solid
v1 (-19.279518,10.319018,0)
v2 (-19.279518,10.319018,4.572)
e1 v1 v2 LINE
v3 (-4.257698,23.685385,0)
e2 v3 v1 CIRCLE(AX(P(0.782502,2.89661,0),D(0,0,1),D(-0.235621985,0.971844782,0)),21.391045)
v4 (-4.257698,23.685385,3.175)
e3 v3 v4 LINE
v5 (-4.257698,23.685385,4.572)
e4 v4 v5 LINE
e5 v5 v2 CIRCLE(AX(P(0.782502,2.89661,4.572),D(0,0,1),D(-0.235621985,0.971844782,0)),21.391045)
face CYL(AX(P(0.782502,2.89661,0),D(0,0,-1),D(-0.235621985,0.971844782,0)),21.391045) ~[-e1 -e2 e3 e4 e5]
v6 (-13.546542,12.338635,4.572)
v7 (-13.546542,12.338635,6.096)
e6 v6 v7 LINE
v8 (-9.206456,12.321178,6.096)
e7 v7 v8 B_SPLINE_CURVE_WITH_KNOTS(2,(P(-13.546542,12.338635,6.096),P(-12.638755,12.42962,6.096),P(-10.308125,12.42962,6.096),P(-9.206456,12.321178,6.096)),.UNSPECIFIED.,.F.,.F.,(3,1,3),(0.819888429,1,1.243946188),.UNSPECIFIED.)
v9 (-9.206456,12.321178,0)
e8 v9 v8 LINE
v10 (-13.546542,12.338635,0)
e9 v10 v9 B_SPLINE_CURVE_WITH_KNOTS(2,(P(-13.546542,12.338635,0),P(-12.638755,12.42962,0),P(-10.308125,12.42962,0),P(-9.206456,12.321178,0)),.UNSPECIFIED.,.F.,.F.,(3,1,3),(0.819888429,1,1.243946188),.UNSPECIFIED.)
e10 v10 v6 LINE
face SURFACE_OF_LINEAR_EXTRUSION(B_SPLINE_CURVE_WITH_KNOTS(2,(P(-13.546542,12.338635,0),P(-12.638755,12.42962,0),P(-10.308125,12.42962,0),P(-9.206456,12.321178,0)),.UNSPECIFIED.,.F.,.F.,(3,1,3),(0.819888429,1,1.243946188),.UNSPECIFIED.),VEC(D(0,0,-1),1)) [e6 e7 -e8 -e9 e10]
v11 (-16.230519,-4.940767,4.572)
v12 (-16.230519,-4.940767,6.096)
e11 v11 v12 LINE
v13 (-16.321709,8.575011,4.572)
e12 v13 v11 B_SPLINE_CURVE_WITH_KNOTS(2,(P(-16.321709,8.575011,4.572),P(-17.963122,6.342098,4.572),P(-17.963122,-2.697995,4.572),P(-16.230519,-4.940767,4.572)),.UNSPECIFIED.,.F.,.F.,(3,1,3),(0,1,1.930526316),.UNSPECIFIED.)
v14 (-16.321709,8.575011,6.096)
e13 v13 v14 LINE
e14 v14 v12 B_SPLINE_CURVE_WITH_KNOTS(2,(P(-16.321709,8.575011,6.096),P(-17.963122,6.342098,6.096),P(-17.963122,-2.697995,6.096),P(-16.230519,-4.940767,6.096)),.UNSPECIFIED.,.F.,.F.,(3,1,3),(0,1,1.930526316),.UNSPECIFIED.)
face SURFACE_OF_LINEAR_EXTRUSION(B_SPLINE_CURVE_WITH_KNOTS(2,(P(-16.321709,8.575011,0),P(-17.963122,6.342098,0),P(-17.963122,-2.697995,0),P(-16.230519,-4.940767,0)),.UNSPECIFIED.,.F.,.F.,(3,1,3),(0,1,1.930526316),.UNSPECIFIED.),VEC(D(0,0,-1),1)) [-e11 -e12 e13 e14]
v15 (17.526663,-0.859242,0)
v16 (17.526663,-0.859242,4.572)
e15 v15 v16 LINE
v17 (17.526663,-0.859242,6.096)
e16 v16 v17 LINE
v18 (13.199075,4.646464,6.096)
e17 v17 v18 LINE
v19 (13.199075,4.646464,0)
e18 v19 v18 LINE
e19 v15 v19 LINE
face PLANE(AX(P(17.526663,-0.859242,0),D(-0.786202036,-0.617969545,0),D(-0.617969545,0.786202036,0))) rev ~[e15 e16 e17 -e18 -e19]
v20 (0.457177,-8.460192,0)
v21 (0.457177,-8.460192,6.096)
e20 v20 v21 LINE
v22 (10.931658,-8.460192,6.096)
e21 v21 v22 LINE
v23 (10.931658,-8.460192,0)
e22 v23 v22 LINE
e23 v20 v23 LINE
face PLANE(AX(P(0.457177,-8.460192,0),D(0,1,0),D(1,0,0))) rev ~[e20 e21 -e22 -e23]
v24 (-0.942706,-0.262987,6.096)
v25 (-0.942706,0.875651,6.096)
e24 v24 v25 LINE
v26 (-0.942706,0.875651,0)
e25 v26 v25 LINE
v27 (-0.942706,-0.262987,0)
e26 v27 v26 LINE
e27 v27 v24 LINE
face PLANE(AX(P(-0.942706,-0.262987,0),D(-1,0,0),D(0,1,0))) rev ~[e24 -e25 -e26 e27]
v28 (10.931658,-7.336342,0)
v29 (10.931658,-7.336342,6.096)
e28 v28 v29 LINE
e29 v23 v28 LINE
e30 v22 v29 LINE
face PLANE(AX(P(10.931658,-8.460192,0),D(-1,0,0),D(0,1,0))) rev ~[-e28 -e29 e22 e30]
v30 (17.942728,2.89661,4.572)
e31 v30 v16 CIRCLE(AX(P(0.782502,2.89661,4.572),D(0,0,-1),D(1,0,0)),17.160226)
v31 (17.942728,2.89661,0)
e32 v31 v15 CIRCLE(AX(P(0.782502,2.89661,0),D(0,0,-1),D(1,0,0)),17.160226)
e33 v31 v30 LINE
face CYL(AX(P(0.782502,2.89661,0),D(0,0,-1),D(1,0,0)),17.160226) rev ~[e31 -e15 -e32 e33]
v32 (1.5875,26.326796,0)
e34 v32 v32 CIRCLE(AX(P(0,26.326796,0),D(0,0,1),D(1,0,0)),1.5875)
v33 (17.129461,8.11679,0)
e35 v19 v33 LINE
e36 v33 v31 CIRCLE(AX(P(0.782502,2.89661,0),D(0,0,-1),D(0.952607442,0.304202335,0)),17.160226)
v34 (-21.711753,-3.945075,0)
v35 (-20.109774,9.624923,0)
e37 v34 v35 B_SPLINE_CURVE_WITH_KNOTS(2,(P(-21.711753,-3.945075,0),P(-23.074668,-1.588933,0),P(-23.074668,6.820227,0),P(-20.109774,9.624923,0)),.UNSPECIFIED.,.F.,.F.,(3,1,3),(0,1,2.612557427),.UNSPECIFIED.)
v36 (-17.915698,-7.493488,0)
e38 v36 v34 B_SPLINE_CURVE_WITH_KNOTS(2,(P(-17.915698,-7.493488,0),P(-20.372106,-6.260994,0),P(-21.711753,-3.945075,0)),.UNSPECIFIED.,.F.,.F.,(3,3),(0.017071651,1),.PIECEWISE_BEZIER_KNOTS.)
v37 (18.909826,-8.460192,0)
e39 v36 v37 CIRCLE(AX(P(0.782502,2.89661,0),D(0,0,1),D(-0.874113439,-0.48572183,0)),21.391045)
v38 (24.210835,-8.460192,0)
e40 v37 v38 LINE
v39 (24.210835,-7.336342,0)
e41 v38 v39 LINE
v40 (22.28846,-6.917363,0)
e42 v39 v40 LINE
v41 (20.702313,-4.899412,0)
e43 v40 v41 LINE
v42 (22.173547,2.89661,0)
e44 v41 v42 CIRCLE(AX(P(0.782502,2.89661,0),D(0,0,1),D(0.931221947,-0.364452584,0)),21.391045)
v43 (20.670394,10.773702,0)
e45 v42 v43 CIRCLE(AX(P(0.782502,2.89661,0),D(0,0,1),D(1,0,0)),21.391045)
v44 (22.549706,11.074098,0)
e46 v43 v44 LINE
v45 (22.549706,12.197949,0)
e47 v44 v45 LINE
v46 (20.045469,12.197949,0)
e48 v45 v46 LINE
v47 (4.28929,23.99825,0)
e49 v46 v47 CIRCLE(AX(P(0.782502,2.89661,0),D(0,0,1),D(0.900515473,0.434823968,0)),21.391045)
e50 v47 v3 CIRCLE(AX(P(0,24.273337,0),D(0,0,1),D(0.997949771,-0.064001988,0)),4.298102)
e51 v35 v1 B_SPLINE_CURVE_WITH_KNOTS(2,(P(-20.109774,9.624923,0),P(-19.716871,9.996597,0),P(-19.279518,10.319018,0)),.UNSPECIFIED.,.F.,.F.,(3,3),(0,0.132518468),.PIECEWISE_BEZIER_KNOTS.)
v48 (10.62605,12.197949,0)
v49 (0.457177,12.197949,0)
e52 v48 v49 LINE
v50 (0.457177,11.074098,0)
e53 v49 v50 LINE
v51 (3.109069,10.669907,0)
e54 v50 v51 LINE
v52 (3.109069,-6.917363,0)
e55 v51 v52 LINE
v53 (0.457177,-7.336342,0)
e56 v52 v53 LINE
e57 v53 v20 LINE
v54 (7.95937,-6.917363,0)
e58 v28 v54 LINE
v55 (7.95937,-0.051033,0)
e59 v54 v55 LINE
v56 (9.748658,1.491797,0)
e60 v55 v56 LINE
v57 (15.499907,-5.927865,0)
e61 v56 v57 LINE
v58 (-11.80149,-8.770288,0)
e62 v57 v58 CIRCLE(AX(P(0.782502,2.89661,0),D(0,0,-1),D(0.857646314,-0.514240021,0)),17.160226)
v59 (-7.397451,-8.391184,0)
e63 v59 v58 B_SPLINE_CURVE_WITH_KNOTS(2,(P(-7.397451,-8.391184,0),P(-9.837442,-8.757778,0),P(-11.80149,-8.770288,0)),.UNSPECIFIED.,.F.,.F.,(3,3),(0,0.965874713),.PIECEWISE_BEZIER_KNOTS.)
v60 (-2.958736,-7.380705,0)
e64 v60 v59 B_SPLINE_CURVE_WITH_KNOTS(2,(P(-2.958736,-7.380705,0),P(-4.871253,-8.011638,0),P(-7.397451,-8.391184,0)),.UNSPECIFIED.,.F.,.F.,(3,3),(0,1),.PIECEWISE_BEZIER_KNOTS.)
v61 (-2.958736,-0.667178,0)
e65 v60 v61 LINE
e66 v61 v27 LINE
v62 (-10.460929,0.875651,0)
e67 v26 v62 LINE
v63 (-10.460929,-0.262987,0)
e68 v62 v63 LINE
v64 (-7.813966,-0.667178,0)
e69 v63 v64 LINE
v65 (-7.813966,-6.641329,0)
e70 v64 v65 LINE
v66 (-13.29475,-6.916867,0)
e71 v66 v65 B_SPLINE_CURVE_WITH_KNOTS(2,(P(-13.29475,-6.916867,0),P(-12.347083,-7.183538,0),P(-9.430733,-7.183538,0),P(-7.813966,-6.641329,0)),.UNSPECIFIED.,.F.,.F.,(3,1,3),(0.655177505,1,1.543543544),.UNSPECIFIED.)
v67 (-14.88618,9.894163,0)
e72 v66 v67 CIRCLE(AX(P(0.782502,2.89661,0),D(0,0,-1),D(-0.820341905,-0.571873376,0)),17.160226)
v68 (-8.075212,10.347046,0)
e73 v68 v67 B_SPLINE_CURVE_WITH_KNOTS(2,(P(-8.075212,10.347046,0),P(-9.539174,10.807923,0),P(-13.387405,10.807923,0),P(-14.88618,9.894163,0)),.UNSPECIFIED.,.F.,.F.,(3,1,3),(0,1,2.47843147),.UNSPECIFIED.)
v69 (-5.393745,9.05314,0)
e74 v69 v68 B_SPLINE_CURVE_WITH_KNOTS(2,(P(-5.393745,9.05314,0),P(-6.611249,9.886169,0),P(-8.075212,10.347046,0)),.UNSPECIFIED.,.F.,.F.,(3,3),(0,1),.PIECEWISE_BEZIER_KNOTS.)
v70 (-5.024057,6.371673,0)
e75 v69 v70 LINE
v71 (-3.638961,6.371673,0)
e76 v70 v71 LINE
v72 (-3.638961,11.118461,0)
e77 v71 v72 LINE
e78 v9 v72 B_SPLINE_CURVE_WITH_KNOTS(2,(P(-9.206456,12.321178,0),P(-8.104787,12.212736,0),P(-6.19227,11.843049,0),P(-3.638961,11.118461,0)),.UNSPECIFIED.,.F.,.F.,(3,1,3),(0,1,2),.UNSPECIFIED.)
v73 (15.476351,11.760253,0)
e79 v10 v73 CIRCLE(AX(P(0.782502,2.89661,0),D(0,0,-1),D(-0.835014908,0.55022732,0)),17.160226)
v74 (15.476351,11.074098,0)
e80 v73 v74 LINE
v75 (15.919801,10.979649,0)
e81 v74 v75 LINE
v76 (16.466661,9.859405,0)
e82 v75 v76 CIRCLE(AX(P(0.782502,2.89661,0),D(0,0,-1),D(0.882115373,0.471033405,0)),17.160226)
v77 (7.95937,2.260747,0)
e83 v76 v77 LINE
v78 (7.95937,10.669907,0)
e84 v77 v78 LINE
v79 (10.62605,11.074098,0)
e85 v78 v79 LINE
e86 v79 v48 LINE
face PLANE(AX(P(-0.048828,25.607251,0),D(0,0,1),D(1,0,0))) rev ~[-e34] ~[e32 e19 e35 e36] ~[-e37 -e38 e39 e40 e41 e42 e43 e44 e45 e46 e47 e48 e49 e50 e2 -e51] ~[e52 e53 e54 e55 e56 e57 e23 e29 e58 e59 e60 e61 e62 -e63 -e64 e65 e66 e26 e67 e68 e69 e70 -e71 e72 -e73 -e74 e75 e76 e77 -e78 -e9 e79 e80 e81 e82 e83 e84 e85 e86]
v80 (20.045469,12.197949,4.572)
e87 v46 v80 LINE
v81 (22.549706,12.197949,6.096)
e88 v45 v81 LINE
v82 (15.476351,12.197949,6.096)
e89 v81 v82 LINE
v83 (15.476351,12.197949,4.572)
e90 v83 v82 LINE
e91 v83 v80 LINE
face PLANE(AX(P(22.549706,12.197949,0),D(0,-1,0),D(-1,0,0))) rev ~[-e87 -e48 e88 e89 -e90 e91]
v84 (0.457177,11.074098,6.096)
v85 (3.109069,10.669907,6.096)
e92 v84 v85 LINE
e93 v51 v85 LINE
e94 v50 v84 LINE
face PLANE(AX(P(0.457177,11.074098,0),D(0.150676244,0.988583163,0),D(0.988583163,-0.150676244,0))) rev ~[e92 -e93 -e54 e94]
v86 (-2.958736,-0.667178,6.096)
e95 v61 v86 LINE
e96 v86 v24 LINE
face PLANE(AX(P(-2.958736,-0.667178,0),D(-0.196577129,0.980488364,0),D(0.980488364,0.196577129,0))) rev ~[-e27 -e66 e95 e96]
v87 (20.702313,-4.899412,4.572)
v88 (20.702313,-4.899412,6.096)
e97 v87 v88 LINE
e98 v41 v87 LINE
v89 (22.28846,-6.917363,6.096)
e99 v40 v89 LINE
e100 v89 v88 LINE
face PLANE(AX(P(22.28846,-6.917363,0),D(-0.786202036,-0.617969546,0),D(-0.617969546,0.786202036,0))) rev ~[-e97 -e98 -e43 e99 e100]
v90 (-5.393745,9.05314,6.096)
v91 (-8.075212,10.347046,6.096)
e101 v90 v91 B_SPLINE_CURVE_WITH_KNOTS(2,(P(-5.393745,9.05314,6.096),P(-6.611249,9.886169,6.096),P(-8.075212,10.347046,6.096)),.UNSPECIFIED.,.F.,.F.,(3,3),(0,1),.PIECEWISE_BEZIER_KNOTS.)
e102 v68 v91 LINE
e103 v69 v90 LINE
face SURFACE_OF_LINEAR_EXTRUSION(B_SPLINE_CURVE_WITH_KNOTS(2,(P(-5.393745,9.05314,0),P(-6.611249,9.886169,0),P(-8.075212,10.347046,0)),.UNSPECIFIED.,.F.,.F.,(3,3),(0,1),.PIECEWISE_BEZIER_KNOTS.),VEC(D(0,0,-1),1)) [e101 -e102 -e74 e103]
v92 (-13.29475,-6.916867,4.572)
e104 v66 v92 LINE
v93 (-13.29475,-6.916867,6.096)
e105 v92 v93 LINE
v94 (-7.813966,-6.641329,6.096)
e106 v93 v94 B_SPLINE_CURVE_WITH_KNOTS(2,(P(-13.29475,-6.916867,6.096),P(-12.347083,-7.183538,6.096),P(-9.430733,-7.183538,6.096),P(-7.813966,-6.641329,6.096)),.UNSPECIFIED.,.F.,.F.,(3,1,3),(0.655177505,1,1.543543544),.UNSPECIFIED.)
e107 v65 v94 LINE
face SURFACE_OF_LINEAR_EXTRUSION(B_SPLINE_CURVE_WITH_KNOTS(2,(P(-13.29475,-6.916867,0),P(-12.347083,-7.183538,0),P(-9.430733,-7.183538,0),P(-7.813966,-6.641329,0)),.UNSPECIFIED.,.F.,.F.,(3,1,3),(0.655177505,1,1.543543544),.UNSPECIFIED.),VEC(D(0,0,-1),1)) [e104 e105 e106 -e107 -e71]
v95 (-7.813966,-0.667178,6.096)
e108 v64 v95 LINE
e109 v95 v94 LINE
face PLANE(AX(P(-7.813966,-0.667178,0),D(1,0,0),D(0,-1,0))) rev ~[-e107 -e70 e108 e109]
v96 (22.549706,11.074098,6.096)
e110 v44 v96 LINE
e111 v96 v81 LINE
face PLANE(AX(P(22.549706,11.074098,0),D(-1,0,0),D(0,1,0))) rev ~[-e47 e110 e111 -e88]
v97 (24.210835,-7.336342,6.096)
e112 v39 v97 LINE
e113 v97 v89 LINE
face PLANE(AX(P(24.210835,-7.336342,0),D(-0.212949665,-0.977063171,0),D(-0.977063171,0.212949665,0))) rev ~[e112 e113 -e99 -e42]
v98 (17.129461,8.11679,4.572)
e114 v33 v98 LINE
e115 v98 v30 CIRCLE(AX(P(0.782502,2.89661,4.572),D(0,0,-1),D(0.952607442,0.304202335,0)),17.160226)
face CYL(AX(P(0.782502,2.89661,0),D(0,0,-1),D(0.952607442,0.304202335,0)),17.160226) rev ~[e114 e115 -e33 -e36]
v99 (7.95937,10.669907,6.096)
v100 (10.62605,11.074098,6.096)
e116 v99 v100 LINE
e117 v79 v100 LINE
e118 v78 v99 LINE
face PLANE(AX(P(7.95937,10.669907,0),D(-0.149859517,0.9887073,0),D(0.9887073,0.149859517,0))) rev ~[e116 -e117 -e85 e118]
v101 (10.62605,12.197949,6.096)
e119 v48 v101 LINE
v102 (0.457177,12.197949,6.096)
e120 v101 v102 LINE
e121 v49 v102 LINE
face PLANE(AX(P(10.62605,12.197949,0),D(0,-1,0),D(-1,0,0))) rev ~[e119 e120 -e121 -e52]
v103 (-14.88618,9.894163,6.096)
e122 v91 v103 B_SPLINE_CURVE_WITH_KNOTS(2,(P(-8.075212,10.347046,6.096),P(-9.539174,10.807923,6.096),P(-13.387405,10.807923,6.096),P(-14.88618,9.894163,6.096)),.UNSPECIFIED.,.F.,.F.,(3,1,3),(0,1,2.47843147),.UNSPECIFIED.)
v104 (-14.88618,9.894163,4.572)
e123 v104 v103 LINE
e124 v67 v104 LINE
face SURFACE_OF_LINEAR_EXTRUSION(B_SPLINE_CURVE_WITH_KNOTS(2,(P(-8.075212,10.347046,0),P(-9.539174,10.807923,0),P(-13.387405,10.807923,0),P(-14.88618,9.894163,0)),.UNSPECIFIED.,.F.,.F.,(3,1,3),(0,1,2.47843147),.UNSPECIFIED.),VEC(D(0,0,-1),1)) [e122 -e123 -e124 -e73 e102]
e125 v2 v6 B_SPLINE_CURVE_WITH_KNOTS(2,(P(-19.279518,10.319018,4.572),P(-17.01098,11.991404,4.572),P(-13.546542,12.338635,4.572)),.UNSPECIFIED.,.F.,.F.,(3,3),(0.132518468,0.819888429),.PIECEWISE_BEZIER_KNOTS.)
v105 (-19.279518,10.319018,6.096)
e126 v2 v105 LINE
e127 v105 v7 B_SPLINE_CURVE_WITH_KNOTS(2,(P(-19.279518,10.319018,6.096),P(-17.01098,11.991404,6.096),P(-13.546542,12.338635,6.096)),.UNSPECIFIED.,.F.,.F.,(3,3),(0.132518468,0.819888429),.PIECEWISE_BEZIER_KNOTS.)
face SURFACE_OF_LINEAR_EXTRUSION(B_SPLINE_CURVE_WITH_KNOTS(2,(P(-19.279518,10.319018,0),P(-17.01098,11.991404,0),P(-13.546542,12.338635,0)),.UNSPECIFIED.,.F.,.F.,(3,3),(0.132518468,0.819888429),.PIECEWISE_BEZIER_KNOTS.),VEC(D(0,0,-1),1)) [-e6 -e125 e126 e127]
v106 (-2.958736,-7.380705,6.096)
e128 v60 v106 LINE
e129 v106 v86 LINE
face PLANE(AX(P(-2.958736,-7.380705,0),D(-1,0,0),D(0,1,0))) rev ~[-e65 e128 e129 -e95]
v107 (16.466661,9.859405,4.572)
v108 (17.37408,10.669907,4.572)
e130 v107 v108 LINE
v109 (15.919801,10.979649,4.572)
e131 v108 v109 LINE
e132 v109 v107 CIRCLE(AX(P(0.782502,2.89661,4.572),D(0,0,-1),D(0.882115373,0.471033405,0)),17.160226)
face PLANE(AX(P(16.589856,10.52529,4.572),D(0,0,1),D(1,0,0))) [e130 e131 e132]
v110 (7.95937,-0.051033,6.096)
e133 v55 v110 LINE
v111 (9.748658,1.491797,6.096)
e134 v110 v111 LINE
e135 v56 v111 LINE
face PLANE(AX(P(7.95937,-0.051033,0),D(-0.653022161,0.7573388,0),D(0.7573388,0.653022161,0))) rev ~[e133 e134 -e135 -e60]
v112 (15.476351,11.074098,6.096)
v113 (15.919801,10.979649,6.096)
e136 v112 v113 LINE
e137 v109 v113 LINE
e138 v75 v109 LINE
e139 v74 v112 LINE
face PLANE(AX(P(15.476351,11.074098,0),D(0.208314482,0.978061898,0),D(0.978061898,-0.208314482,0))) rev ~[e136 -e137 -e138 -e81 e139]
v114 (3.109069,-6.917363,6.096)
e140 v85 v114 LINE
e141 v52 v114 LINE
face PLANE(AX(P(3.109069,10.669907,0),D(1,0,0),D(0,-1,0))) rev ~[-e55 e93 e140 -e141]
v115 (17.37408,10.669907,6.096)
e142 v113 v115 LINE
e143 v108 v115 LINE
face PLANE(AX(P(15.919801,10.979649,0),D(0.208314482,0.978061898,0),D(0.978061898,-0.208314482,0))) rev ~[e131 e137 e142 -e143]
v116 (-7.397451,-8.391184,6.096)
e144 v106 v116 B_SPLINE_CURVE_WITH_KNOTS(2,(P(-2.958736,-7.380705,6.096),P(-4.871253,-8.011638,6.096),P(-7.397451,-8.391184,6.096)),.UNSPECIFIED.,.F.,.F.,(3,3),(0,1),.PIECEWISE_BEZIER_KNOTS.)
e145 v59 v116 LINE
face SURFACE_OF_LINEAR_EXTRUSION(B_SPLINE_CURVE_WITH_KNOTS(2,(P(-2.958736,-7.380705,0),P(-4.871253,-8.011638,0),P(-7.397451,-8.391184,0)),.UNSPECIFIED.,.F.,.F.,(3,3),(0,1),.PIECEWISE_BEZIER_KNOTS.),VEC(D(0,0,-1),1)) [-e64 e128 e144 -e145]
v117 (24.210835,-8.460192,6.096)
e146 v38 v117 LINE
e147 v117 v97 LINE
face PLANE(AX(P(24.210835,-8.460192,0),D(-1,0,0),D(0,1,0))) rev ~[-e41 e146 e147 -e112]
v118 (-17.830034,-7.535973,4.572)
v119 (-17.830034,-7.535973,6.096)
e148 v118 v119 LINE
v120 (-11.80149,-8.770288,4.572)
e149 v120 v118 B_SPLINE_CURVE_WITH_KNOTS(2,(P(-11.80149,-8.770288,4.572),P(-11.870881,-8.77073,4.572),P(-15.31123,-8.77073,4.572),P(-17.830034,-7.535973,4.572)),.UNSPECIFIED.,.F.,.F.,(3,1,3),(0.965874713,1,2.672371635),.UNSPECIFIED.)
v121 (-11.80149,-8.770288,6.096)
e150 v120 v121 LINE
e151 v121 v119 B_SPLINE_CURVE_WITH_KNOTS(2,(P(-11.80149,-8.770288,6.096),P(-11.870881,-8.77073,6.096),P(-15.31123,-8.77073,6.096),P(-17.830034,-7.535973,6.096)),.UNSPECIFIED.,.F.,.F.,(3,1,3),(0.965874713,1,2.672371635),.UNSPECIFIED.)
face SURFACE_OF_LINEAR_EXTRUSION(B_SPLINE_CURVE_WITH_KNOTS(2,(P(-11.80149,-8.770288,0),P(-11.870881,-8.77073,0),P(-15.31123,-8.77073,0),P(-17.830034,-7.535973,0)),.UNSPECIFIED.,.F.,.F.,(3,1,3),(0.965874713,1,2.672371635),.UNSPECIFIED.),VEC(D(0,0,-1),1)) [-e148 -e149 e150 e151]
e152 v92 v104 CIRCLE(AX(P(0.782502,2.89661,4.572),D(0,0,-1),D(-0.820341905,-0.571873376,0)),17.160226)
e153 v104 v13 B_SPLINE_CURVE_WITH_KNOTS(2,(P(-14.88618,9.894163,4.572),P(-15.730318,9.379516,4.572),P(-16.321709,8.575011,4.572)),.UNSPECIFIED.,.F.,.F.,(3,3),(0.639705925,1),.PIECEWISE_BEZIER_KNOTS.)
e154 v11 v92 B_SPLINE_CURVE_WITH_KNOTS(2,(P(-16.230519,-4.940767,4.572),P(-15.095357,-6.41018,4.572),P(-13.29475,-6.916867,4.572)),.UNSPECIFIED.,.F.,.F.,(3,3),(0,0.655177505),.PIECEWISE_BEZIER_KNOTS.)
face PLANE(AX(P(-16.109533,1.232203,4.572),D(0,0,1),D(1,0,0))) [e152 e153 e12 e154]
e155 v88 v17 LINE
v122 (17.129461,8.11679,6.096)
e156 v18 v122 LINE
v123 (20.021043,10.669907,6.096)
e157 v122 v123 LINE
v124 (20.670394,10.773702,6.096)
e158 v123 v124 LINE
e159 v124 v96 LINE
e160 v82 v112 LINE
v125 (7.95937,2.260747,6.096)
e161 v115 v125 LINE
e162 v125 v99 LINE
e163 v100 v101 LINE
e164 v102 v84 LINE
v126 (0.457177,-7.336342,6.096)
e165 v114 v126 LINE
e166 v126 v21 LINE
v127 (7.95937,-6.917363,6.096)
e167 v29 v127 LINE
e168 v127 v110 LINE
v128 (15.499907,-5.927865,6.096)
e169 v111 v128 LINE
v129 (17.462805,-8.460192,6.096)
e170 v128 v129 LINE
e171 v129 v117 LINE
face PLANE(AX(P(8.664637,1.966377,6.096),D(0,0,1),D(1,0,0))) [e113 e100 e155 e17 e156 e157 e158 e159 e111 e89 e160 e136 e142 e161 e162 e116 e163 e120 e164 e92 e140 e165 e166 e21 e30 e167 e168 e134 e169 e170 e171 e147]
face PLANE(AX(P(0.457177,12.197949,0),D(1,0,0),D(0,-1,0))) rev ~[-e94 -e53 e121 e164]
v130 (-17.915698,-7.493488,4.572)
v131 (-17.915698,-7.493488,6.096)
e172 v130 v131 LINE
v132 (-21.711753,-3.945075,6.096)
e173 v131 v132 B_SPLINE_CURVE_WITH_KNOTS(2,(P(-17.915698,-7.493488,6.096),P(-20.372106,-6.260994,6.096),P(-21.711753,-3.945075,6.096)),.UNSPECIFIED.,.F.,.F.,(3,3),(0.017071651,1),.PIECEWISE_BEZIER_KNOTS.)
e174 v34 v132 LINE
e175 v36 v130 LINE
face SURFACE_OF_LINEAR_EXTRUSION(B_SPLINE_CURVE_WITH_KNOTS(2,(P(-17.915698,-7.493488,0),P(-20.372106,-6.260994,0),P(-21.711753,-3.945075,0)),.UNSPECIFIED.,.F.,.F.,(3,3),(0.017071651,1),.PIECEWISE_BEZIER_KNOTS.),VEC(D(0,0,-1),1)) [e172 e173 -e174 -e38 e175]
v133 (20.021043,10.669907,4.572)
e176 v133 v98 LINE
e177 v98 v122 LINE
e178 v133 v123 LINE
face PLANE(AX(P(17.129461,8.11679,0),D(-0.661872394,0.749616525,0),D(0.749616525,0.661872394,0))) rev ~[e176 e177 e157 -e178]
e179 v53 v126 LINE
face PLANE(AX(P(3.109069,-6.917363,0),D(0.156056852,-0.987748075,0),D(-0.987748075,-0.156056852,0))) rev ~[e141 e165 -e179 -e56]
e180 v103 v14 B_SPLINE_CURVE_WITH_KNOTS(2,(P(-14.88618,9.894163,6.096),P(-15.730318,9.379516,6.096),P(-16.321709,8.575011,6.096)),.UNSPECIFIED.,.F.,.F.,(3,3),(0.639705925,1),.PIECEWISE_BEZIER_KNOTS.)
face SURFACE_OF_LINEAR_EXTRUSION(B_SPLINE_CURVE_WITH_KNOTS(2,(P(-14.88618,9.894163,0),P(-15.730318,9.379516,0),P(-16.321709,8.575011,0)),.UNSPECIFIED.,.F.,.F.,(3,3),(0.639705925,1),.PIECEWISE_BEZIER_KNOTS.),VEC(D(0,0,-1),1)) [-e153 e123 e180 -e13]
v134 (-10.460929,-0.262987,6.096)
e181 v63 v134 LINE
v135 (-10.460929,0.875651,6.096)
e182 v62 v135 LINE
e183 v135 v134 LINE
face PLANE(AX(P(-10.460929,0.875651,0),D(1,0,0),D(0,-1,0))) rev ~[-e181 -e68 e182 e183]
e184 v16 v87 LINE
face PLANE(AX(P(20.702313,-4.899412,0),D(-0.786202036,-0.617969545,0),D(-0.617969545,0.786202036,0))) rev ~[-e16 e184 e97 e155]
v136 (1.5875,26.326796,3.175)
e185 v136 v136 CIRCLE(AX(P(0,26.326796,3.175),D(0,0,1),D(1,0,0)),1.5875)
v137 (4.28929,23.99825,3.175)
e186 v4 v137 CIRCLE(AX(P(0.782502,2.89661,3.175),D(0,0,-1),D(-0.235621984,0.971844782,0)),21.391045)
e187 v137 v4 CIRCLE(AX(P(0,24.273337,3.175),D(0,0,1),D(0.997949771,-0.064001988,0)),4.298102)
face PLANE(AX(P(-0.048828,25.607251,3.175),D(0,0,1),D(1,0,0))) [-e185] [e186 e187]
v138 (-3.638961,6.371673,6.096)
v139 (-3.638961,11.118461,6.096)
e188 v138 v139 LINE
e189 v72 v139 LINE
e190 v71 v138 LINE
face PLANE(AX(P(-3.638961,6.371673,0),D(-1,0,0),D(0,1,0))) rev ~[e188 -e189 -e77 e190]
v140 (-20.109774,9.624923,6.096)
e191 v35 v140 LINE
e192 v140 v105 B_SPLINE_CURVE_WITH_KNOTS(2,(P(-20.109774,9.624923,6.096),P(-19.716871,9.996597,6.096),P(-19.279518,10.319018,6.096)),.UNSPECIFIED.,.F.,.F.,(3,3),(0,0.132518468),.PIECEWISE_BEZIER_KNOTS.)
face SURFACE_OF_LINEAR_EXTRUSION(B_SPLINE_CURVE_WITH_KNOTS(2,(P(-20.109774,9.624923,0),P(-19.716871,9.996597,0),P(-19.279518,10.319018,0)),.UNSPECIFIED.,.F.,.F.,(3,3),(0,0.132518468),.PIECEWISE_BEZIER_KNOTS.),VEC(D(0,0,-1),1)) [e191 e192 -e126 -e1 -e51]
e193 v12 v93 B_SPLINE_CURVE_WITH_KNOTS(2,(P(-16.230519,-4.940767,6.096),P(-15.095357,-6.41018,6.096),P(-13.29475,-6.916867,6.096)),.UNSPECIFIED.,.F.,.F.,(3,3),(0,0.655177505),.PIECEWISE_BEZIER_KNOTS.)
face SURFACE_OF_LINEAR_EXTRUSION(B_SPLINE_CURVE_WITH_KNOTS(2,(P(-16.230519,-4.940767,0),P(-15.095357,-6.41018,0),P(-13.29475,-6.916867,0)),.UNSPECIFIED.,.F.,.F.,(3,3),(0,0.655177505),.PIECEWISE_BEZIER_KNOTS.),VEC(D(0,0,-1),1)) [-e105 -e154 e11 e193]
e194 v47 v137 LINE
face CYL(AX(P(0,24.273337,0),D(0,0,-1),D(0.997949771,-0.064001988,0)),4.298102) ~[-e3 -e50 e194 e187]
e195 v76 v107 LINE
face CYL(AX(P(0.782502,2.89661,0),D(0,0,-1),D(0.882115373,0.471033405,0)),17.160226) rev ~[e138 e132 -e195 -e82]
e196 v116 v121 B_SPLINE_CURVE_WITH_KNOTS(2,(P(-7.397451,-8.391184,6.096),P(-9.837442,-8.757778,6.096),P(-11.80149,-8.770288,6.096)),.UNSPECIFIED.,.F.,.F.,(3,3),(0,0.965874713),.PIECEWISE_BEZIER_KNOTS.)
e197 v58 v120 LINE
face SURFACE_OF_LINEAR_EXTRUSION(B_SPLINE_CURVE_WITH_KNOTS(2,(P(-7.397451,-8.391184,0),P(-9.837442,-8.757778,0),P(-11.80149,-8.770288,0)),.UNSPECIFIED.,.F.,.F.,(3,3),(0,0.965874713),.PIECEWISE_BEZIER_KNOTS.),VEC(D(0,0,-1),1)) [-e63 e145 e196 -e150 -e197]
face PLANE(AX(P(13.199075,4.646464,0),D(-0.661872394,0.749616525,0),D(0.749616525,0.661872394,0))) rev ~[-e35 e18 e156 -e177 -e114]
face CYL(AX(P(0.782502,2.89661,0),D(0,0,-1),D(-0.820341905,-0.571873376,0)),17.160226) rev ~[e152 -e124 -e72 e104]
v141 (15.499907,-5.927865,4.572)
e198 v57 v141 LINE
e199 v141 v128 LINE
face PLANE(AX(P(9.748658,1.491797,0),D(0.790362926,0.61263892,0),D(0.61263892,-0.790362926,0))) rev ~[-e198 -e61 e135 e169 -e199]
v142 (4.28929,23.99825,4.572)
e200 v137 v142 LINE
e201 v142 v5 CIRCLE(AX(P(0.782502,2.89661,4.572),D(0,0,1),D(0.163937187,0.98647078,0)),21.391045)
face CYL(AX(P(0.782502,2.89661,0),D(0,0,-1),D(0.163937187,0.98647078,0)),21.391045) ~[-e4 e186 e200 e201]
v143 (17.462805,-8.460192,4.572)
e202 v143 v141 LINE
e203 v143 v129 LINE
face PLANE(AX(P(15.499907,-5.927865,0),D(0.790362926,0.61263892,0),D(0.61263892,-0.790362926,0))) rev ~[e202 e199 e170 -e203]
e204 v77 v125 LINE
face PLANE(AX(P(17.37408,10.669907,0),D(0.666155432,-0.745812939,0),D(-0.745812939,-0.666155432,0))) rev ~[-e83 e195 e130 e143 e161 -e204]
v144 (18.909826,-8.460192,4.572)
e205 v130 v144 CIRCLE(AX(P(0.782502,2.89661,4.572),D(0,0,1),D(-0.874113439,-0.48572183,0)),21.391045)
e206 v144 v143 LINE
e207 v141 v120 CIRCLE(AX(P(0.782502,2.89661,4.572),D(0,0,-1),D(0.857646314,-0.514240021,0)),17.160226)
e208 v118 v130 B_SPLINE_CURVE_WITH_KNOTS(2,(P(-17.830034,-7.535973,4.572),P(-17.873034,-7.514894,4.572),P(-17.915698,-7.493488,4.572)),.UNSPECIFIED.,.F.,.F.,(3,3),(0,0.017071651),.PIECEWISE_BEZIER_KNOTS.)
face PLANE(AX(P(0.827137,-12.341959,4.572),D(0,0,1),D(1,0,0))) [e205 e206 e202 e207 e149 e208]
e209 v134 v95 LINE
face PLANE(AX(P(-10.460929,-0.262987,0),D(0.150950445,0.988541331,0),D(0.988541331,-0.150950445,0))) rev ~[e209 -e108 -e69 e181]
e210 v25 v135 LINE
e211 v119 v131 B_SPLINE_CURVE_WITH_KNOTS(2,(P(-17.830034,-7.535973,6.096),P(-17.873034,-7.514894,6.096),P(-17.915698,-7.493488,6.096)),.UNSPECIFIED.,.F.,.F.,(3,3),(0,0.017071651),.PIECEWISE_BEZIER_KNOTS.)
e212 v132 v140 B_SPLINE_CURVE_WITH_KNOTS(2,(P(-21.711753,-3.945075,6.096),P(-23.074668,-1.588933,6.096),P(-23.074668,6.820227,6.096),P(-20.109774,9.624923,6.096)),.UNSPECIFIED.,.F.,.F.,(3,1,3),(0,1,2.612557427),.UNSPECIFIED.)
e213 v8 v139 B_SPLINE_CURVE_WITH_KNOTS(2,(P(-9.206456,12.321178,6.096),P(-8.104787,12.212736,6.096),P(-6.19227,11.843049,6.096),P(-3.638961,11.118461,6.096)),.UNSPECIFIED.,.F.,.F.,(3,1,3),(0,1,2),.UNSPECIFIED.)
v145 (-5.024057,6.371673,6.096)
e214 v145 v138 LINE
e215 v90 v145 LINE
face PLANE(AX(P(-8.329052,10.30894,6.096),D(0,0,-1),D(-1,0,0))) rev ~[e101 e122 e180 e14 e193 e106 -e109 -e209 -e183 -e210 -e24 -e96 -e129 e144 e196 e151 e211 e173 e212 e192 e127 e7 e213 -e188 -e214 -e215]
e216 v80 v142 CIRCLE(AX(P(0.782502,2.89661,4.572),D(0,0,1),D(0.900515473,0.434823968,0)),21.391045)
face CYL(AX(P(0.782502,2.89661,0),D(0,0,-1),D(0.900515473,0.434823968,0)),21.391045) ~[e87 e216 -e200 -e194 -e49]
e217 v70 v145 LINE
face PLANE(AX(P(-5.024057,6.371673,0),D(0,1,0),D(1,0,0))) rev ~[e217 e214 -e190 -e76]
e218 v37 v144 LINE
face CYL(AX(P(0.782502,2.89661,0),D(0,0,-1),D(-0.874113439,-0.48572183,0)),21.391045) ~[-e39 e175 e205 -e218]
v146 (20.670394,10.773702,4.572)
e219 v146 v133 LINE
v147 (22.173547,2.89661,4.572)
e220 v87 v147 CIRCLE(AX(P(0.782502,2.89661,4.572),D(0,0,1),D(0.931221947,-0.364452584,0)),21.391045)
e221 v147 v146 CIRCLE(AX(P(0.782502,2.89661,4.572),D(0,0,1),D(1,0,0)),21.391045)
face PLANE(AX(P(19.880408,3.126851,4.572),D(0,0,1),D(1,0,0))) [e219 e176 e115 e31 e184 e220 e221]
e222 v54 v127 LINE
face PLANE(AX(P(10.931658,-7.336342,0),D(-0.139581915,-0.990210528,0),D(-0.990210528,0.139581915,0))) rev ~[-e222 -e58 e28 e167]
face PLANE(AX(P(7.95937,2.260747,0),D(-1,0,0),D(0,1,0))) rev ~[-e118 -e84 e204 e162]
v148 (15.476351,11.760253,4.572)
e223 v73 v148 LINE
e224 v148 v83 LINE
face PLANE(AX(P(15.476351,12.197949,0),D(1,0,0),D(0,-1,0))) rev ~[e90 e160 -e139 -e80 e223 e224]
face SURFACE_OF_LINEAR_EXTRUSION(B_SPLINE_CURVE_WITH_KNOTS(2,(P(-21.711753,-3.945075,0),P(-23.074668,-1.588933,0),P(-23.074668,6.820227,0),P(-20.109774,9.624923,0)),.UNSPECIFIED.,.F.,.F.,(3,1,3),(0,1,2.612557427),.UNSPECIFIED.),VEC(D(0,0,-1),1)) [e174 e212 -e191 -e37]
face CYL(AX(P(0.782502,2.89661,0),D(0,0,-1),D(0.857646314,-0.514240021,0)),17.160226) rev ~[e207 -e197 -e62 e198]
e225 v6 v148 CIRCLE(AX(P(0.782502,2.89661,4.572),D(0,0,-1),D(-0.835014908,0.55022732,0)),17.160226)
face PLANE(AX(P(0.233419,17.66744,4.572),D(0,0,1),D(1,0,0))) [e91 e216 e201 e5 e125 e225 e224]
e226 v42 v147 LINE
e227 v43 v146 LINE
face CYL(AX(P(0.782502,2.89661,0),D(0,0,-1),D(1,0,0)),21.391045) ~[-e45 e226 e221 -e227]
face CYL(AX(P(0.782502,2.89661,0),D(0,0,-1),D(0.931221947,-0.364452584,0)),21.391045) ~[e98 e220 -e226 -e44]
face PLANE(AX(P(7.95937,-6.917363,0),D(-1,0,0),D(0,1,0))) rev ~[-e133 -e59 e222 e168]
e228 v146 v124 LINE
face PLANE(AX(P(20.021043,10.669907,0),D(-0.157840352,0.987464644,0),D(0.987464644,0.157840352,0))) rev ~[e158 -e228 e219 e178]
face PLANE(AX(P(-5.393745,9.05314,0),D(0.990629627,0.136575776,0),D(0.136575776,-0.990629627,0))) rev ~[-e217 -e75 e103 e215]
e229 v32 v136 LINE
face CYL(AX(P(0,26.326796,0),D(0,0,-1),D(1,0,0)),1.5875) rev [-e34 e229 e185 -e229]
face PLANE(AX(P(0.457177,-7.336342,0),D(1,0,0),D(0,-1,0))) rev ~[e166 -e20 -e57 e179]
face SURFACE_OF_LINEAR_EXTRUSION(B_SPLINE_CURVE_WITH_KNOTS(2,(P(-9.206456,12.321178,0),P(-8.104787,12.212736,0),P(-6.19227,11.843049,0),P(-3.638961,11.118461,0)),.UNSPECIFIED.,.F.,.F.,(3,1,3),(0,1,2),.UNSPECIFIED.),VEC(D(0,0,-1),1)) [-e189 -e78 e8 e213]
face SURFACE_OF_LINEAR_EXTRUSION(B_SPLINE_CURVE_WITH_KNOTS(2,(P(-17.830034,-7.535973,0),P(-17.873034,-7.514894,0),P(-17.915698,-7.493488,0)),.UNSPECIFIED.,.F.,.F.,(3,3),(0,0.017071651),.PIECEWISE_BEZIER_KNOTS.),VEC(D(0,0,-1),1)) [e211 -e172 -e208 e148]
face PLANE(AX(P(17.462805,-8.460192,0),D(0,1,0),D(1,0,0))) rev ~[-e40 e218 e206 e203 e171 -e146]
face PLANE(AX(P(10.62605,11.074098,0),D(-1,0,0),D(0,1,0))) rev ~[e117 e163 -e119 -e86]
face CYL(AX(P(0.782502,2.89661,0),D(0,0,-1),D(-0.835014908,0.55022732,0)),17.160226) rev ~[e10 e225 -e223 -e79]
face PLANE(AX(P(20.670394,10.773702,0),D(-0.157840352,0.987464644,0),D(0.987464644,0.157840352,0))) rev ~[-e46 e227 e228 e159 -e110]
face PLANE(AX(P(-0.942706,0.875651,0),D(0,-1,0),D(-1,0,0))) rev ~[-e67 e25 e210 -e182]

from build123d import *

# Parameters (mm, degrees)
F1_DEPTH = 6.096
F2_DEPTH = 4.572
F0_R     = 1.5875
F3_DEPTH = 3.175


with BuildPart() as f1:
    # F0 (on Top) → F1 (new body)
    with BuildSketch(Plane.XY):
        with BuildLine():
            Line((13.1990751617, 4.6464640634), (17.129461098, 8.1167903742))
            ThreePointArc((17.129461098, 8.1167903742), (16.8217445929, 8.9971059692), (16.4666606544, 9.8594054479))
            Line((16.4666606544, 9.8594054479), (7.9593701355, 2.2607470054))
            Line((7.9593701355, 2.2607470054), (7.9593701355, 10.6699067182))
            Line((7.9593701355, 10.6699067182), (10.6260497396, 11.0740984512))
            Line((10.6260497396, 11.0740984512), (10.6260497396, 12.1979486355))
            Line((10.6260497396, 12.1979486355), (0.4571772382, 12.1979486355))
            Line((0.4571772382, 12.1979486355), (0.4571772382, 11.0740984512))
            Line((0.4571772382, 11.0740984512), (3.1090693399, 10.6699067182))
            Line((3.1090693399, 10.6699067182), (3.1090693399, -6.9173628335))
            Line((3.1090693399, -6.9173628335), (0.4571772382, -7.3363420689))
            Line((0.4571772382, -7.3363420689), (0.4571772382, -8.4601922533))
            Line((0.4571772382, -8.4601922533), (10.9316581231, -8.4601922533))
            Line((10.9316581231, -8.4601922533), (10.9316581231, -7.3363420689))
            Line((10.9316581231, -7.3363420689), (7.9593701355, -6.9173628335))
            Line((7.9593701355, -6.9173628335), (7.9593701355, -0.0510325405))
            Line((7.9593701355, -0.0510325405), (9.748657929, 1.4917968793))
            Line((9.748657929, 1.4917968793), (15.4999066991, -5.927865272))
            ThreePointArc((15.4999066991, -5.927865272), (16.7161227426, -3.4746609665), (17.5266633254, -0.8592419192))
            Line((17.5266633254, -0.8592419192), (13.1990751617, 4.6464640634))
        make_face()
        with BuildLine():
            ThreePointArc((16.4666606544, 9.8594054479), (16.8217445929, 8.9971059692), (17.129461098, 8.1167903742))
            Line((17.129461098, 8.1167903742), (20.0210429475, 10.6699067182))
            Line((20.0210429475, 10.6699067182), (20.6703936904, 10.7737015738))
            ThreePointArc((20.6703936904, 10.7737015738), (20.3708801374, 11.4915066696), (20.0454692082, 12.1979486355))
            Line((20.0454692082, 12.1979486355), (15.4763505353, 12.1979486355))
            Line((15.4763505353, 12.1979486355), (15.4763505353, 11.7602529477))
            ThreePointArc((15.4763505353, 11.7602529477), (15.7031816224, 11.3728515682), (15.9198012697, 10.9796492038))
            Line((15.9198012697, 10.9796492038), (17.3740800133, 10.6699067182))
            Line((17.3740800133, 10.6699067182), (16.4666606544, 9.8594054479))
        make_face()
        with BuildLine():
            ThreePointArc((20.0454692082, 12.1979486355), (20.3708801374, 11.4915066696), (20.6703936904, 10.7737015738))
            Line((20.6703936904, 10.7737015738), (22.5497058623, 11.0740984512))
            Line((22.5497058623, 11.0740984512), (22.5497058623, 12.1979486355))
            Line((22.5497058623, 12.1979486355), (20.0454692082, 12.1979486355))
        make_face()
        with BuildLine():
            Line((20.7023127689, -4.8994119814), (17.5266633254, -0.8592419192))
            ThreePointArc((17.5266633254, -0.8592419192), (16.7161227426, -3.4746609665), (15.4999066991, -5.927865272))
            Line((15.4999066991, -5.927865272), (17.4628050278, -8.4601922533))
            Line((17.4628050278, -8.4601922533), (18.9098256888, -8.4601922533))
            ThreePointArc((18.9098256888, -8.4601922533), (19.8891997575, -6.7216497988), (20.7023127689, -4.8994119814))
        make_face()
        with BuildLine():
            Line((22.2884599861, -6.9173628335), (20.7023127689, -4.8994119814))
            ThreePointArc((20.7023127689, -4.8994119814), (19.8891997575, -6.7216497988), (18.9098256888, -8.4601922533))
            Line((18.9098256888, -8.4601922533), (24.2108353014, -8.4601922533))
            Line((24.2108353014, -8.4601922533), (24.2108353014, -7.3363420689))
            Line((24.2108353014, -7.3363420689), (22.2884599861, -6.9173628335))
        make_face()
        with BuildLine():
            Line((15.4763505353, 11.0740984512), (15.9198012697, 10.9796492038))
            ThreePointArc((15.9198012697, 10.9796492038), (15.7031816224, 11.3728515682), (15.4763505353, 11.7602529477))
            Line((15.4763505353, 11.7602529477), (15.4763505353, 11.0740984512))
        make_face()
    extrude(amount=F1_DEPTH)



with BuildPart() as f1b:
    # F0 (on Top) → F1, piece 2 (new body)
    with BuildSketch(Plane.XY):
        with BuildLine():
            add(Edge.make_bspline(
                [(-13.5465420725, 12.3386346598), (-12.6387551901, 12.4296195068), (-11.6488580811, 12.4296195068)],
                knots=[0.819888429, 0.819888429, 0.819888429, 1, 1, 1], degree=2))
            ThreePointArc((-13.5465420725, 12.3386346598), (-14.2660777227, 11.1436447733), (-14.8861798945, 9.8941626097))
            add(Edge.make_bspline(
                [(-11.0918621563, 10.8079234075), (-13.3874045962, 10.8079234075), (-14.8861798945, 9.8941626097)],
                knots=[0, 0, 0, 0.6397059246, 0.6397059246, 0.6397059246], degree=2))
            add(Edge.make_bspline(
                [(-8.0752116615, 10.3470462486), (-9.5391744016, 10.8079234075), (-11.0918621563, 10.8079234075)],
                knots=[0, 0, 0, 1, 1, 1], degree=2))
            add(Edge.make_bspline(
                [(-5.393744555, 9.0531397863), (-6.6112489213, 9.8861690896), (-8.0752116615, 10.3470462486)],
                knots=[0, 0, 0, 1, 1, 1], degree=2))
            Line((-5.393744555, 9.0531397863), (-5.0240569943, 6.3716726798))
            Line((-5.0240569943, 6.3716726798), (-3.6389609338, 6.3716726798))
            Line((-3.6389609338, 6.3716726798), (-3.6389609338, 11.1184609584))
            add(Edge.make_bspline(
                [(-7.1485281761, 12.0278923576), (-6.1922696859, 11.8430485773), (-3.6389609338, 11.1184609584)],
                knots=[0, 0, 0, 1, 1, 1], degree=2))
            add(Edge.make_bspline(
                [(-9.2064555971, 12.3211778224), (-8.1047866663, 12.2127361379), (-7.1485281761, 12.0278923576)],
                knots=[0, 0, 0, 1, 1, 1], degree=2))
            add(Edge.make_bspline(
                [(-11.6488580811, 12.4296195068), (-10.3081245278, 12.4296195068), (-9.2064555971, 12.3211778224)],
                knots=[0, 0, 0, 1, 1, 1], degree=2))
        make_face()
        with BuildLine():
            ThreePointArc((-13.2947500331, -6.9168666563), (-12.5802923039, -7.8694978593), (-11.801489684, -8.7702878097))
            add(Edge.make_bspline(
                [(-7.3974511336, -8.3911839086), (-9.8374422228, -8.7577776918), (-11.801489684, -8.7702878097)],
                knots=[0, 0, 0, 0.9658747135, 0.9658747135, 0.9658747135], degree=2))
            add(Edge.make_bspline(
                [(-2.9587358222, -7.3807045762), (-4.8712528026, -8.011638013), (-7.3974511336, -8.3911839086)],
                knots=[0, 0, 0, 1, 1, 1], degree=2))
            Line((-2.9587358222, -7.3807045762), (-2.9587358222, -0.6671784749))
            Line((-2.9587358222, -0.6671784749), (-0.9427063248, -0.2629867419))
            Line((-0.9427063248, -0.2629867419), (-0.9427063248, 0.8756509448))
            Line((-0.9427063248, 0.8756509448), (-10.4609287195, 0.8756509448))
            Line((-10.4609287195, 0.8756509448), (-10.4609287195, -0.2629867419))
            Line((-10.4609287195, -0.2629867419), (-7.8139657853, -0.6671784749))
            Line((-7.8139657853, -0.6671784749), (-7.8139657853, -6.6413294549))
            add(Edge.make_bspline(
                [(-11.2150913432, -7.1835378772), (-9.4307327172, -7.1835378772), (-7.8139657853, -6.6413294549)],
                knots=[0, 0, 0, 1, 1, 1], degree=2))
            add(Edge.make_bspline(
                [(-13.2947500331, -6.9168666563), (-12.3470834343, -7.1835378772), (-11.2150913432, -7.1835378772)],
                knots=[0.6551775055, 0.6551775055, 0.6551775055, 1, 1, 1], degree=2))
        make_face()
        with BuildLine():
            add(Edge.make_bspline(
                [(-11.801489684, -8.7702878097), (-11.8708813778, -8.7707298042), (-11.9396789621, -8.7707298042)],
                knots=[0.9658747135, 0.9658747135, 0.9658747135, 1, 1, 1], degree=2))
            ThreePointArc((-11.801489684, -8.7702878097), (-12.5802923039, -7.8694978593), (-13.2947500331, -6.9168666563))
            add(Edge.make_bspline(
                [(-16.2305192493, -4.940766676), (-15.095357152, -6.4101799171), (-13.2947500331, -6.9168666563)],
                knots=[0, 0, 0, 0.6551775055, 0.6551775055, 0.6551775055], degree=2))
            add(Edge.make_bspline(
                [(-17.9631216169, 1.6593885734), (-17.9631216169, -2.6979954747), (-16.2305192493, -4.940766676)],
                knots=[0, 0, 0, 1, 1, 1], degree=2))
            add(Edge.make_bspline(
                [(-16.3217088476, 8.5750105412), (-17.9631216169, 6.3420976749), (-17.9631216169, 1.6593885734)],
                knots=[0, 0, 0, 1, 1, 1], degree=2))
            add(Edge.make_bspline(
                [(-14.8861798945, 9.8941626097), (-15.7303175515, 9.3795158179), (-16.3217088476, 8.5750105412)],
                knots=[0.6397059246, 0.6397059246, 0.6397059246, 1, 1, 1], degree=2))
            ThreePointArc((-14.8861798945, 9.8941626097), (-14.2660777227, 11.1436447733), (-13.5465420725, 12.3386346598))
            add(Edge.make_bspline(
                [(-19.2795180694, 10.3190176516), (-17.0109804199, 11.9914040496), (-13.5465420725, 12.3386346598)],
                knots=[0.1325184685, 0.1325184685, 0.1325184685, 0.819888429, 0.819888429, 0.819888429], degree=2))
            ThreePointArc((-19.2795180694, 10.3190176516), (-20.5461171043, 1.2635766126), (-17.9156975267, -7.4934878711))
            add(Edge.make_bspline(
                [(-17.830034095, -7.5359733517), (-17.8730342479, -7.5148940204), (-17.9156975267, -7.4934878711)],
                knots=[0, 0, 0, 0.017071651, 0.017071651, 0.017071651], degree=2))
            add(Edge.make_bspline(
                [(-11.9396789621, -8.7707298042), (-15.3112295152, -8.7707298042), (-17.830034095, -7.5359733517)],
                knots=[0, 0, 0, 1, 1, 1], degree=2))
        make_face()
        with BuildLine():
            add(Edge.make_bspline(
                [(-17.9156975267, -7.4934878711), (-20.3721058809, -6.2609936642), (-21.7117534818, -3.945074846)],
                knots=[0.017071651, 0.017071651, 0.017071651, 1, 1, 1], degree=2))
            ThreePointArc((-17.9156975267, -7.4934878711), (-20.5461171043, 1.2635766126), (-19.2795180694, 10.3190176516))
            add(Edge.make_bspline(
                [(-20.1097740523, 9.6249232134), (-19.7168708088, 9.9965972709), (-19.2795180694, 10.3190176516)],
                knots=[0, 0, 0, 0.1325184685, 0.1325184685, 0.1325184685], degree=2))
            add(Edge.make_bspline(
                [(-23.0746682887, 1.6298135686), (-23.0746682887, 6.82022692), (-20.1097740523, 9.6249232134)],
                knots=[0, 0, 0, 1, 1, 1], degree=2))
            add(Edge.make_bspline(
                [(-21.7117534818, -3.945074846), (-23.0746682887, -1.5889327928), (-23.0746682887, 1.6298135686)],
                knots=[0, 0, 0, 1, 1, 1], degree=2))
        make_face()
    extrude(amount=F1_DEPTH)


with BuildPart() as f1_1:
    add(f1.part)

    add(f1b.part)  # F2 merges F1b
    # F0 (on Top) → F2 (join)
    with BuildSketch(Plane.XY):
        with BuildLine():
            ThreePointArc((-13.5465420725, 12.3386346598), (1.1244113714, 20.0534288841), (15.4763505353, 11.7602529477))
            Line((15.4763505353, 11.7602529477), (15.4763505353, 12.1979486355))
            Line((15.4763505353, 12.1979486355), (20.0454692082, 12.1979486355))
            ThreePointArc((20.0454692082, 12.1979486355), (13.6054197321, 20.0182214035), (4.2892900104, 23.9982503516))
            ThreePointArc((4.2892900104, 23.9982503516), (0, 24.2733374292), (-4.2576981592, 23.685384983))
            ThreePointArc((-4.2576981592, 23.685384983), (-13.4370376563, 18.8772693512), (-19.2795180694, 10.3190176516))
            add(Edge.make_bspline(
                [(-19.2795180694, 10.3190176516), (-17.0109804199, 11.9914040496), (-13.5465420725, 12.3386346598)],
                knots=[0.1325184685, 0.1325184685, 0.1325184685, 0.819888429, 0.819888429, 0.819888429], degree=2))
        make_face()
        with BuildLine():
            add(Edge.make_bspline(
                [(-16.2305192493, -4.940766676), (-15.095357152, -6.4101799171), (-13.2947500331, -6.9168666563)],
                knots=[0, 0, 0, 0.6551775055, 0.6551775055, 0.6551775055], degree=2))
            ThreePointArc((-13.2947500331, -6.9168666563), (-16.3013447934, 1.2793532259), (-14.8861798945, 9.8941626097))
            add(Edge.make_bspline(
                [(-14.8861798945, 9.8941626097), (-15.7303175515, 9.3795158179), (-16.3217088476, 8.5750105412)],
                knots=[0.6397059246, 0.6397059246, 0.6397059246, 1, 1, 1], degree=2))
            add(Edge.make_bspline(
                [(-16.3217088476, 8.5750105412), (-17.9631216169, 6.3420976749), (-17.9631216169, 1.6593885734)],
                knots=[0, 0, 0, 1, 1, 1], degree=2))
            add(Edge.make_bspline(
                [(-17.9631216169, 1.6593885734), (-17.9631216169, -2.6979954747), (-16.2305192493, -4.940766676)],
                knots=[0, 0, 0, 1, 1, 1], degree=2))
        make_face()
        with BuildLine():
            Line((17.4628050278, -8.4601922533), (15.4999066991, -5.927865272))
            ThreePointArc((15.4999066991, -5.927865272), (2.5594951508, -14.1713617347), (-11.801489684, -8.7702878097))
            add(Edge.make_bspline(
                [(-11.801489684, -8.7702878097), (-11.8708813778, -8.7707298042), (-11.9396789621, -8.7707298042)],
                knots=[0.9658747135, 0.9658747135, 0.9658747135, 1, 1, 1], degree=2))
            add(Edge.make_bspline(
                [(-11.9396789621, -8.7707298042), (-15.3112295152, -8.7707298042), (-17.830034095, -7.5359733517)],
                knots=[0, 0, 0, 1, 1, 1], degree=2))
            add(Edge.make_bspline(
                [(-17.830034095, -7.5359733517), (-17.8730342479, -7.5148940204), (-17.9156975267, -7.4934878711)],
                knots=[0, 0, 0, 0.017071651, 0.017071651, 0.017071651], degree=2))
            ThreePointArc((-17.9156975267, -7.4934878711), (0.2211607621, -18.4870686939), (18.9098256888, -8.4601922533))
            Line((18.9098256888, -8.4601922533), (17.4628050278, -8.4601922533))
        make_face()
        with BuildLine():
            ThreePointArc((17.129461098, 8.1167903742), (17.7381923934, 5.5381853901), (17.9427280894, 2.8966096097))
            ThreePointArc((17.9427280894, 2.8966096097), (17.8383947275, 1.0071963016), (17.5266633254, -0.8592419192))
            Line((17.5266633254, -0.8592419192), (20.7023127689, -4.8994119814))
            ThreePointArc((20.7023127689, -4.8994119814), (21.8025208752, -1.0702053402), (22.173547196, 2.8966096097))
            ThreePointArc((22.173547196, 2.8966096097), (21.7943986847, 6.9062245623), (20.6703936904, 10.7737015738))
            Line((20.6703936904, 10.7737015738), (20.0210429475, 10.6699067182))
            Line((20.0210429475, 10.6699067182), (17.129461098, 8.1167903742))
        make_face()
        with BuildLine():
            ThreePointArc((15.9198012697, 10.9796492038), (16.2034067616, 10.424494755), (16.4666606544, 9.8594054479))
            Line((16.4666606544, 9.8594054479), (17.3740800133, 10.6699067182))
            Line((17.3740800133, 10.6699067182), (15.9198012697, 10.9796492038))
        make_face()
    extrude(amount=F2_DEPTH)

    # F0 (on Top) → F3 (join)
    with BuildSketch(Plane.XY):
        with BuildLine():
            ThreePointArc((-4.2576981592, 23.685384983), (0, 24.2733374292), (4.2892900104, 23.9982503516))
            ThreePointArc((4.2892900104, 23.9982503516), (-0.1572281654, 28.5685628013), (-4.2576981592, 23.685384983))
        make_face()
        with Locations((0, 26.3267960399)):
            Circle(F0_R, mode=Mode.SUBTRACT)
    extrude(amount=F3_DEPTH)


solid = f1_1.part
